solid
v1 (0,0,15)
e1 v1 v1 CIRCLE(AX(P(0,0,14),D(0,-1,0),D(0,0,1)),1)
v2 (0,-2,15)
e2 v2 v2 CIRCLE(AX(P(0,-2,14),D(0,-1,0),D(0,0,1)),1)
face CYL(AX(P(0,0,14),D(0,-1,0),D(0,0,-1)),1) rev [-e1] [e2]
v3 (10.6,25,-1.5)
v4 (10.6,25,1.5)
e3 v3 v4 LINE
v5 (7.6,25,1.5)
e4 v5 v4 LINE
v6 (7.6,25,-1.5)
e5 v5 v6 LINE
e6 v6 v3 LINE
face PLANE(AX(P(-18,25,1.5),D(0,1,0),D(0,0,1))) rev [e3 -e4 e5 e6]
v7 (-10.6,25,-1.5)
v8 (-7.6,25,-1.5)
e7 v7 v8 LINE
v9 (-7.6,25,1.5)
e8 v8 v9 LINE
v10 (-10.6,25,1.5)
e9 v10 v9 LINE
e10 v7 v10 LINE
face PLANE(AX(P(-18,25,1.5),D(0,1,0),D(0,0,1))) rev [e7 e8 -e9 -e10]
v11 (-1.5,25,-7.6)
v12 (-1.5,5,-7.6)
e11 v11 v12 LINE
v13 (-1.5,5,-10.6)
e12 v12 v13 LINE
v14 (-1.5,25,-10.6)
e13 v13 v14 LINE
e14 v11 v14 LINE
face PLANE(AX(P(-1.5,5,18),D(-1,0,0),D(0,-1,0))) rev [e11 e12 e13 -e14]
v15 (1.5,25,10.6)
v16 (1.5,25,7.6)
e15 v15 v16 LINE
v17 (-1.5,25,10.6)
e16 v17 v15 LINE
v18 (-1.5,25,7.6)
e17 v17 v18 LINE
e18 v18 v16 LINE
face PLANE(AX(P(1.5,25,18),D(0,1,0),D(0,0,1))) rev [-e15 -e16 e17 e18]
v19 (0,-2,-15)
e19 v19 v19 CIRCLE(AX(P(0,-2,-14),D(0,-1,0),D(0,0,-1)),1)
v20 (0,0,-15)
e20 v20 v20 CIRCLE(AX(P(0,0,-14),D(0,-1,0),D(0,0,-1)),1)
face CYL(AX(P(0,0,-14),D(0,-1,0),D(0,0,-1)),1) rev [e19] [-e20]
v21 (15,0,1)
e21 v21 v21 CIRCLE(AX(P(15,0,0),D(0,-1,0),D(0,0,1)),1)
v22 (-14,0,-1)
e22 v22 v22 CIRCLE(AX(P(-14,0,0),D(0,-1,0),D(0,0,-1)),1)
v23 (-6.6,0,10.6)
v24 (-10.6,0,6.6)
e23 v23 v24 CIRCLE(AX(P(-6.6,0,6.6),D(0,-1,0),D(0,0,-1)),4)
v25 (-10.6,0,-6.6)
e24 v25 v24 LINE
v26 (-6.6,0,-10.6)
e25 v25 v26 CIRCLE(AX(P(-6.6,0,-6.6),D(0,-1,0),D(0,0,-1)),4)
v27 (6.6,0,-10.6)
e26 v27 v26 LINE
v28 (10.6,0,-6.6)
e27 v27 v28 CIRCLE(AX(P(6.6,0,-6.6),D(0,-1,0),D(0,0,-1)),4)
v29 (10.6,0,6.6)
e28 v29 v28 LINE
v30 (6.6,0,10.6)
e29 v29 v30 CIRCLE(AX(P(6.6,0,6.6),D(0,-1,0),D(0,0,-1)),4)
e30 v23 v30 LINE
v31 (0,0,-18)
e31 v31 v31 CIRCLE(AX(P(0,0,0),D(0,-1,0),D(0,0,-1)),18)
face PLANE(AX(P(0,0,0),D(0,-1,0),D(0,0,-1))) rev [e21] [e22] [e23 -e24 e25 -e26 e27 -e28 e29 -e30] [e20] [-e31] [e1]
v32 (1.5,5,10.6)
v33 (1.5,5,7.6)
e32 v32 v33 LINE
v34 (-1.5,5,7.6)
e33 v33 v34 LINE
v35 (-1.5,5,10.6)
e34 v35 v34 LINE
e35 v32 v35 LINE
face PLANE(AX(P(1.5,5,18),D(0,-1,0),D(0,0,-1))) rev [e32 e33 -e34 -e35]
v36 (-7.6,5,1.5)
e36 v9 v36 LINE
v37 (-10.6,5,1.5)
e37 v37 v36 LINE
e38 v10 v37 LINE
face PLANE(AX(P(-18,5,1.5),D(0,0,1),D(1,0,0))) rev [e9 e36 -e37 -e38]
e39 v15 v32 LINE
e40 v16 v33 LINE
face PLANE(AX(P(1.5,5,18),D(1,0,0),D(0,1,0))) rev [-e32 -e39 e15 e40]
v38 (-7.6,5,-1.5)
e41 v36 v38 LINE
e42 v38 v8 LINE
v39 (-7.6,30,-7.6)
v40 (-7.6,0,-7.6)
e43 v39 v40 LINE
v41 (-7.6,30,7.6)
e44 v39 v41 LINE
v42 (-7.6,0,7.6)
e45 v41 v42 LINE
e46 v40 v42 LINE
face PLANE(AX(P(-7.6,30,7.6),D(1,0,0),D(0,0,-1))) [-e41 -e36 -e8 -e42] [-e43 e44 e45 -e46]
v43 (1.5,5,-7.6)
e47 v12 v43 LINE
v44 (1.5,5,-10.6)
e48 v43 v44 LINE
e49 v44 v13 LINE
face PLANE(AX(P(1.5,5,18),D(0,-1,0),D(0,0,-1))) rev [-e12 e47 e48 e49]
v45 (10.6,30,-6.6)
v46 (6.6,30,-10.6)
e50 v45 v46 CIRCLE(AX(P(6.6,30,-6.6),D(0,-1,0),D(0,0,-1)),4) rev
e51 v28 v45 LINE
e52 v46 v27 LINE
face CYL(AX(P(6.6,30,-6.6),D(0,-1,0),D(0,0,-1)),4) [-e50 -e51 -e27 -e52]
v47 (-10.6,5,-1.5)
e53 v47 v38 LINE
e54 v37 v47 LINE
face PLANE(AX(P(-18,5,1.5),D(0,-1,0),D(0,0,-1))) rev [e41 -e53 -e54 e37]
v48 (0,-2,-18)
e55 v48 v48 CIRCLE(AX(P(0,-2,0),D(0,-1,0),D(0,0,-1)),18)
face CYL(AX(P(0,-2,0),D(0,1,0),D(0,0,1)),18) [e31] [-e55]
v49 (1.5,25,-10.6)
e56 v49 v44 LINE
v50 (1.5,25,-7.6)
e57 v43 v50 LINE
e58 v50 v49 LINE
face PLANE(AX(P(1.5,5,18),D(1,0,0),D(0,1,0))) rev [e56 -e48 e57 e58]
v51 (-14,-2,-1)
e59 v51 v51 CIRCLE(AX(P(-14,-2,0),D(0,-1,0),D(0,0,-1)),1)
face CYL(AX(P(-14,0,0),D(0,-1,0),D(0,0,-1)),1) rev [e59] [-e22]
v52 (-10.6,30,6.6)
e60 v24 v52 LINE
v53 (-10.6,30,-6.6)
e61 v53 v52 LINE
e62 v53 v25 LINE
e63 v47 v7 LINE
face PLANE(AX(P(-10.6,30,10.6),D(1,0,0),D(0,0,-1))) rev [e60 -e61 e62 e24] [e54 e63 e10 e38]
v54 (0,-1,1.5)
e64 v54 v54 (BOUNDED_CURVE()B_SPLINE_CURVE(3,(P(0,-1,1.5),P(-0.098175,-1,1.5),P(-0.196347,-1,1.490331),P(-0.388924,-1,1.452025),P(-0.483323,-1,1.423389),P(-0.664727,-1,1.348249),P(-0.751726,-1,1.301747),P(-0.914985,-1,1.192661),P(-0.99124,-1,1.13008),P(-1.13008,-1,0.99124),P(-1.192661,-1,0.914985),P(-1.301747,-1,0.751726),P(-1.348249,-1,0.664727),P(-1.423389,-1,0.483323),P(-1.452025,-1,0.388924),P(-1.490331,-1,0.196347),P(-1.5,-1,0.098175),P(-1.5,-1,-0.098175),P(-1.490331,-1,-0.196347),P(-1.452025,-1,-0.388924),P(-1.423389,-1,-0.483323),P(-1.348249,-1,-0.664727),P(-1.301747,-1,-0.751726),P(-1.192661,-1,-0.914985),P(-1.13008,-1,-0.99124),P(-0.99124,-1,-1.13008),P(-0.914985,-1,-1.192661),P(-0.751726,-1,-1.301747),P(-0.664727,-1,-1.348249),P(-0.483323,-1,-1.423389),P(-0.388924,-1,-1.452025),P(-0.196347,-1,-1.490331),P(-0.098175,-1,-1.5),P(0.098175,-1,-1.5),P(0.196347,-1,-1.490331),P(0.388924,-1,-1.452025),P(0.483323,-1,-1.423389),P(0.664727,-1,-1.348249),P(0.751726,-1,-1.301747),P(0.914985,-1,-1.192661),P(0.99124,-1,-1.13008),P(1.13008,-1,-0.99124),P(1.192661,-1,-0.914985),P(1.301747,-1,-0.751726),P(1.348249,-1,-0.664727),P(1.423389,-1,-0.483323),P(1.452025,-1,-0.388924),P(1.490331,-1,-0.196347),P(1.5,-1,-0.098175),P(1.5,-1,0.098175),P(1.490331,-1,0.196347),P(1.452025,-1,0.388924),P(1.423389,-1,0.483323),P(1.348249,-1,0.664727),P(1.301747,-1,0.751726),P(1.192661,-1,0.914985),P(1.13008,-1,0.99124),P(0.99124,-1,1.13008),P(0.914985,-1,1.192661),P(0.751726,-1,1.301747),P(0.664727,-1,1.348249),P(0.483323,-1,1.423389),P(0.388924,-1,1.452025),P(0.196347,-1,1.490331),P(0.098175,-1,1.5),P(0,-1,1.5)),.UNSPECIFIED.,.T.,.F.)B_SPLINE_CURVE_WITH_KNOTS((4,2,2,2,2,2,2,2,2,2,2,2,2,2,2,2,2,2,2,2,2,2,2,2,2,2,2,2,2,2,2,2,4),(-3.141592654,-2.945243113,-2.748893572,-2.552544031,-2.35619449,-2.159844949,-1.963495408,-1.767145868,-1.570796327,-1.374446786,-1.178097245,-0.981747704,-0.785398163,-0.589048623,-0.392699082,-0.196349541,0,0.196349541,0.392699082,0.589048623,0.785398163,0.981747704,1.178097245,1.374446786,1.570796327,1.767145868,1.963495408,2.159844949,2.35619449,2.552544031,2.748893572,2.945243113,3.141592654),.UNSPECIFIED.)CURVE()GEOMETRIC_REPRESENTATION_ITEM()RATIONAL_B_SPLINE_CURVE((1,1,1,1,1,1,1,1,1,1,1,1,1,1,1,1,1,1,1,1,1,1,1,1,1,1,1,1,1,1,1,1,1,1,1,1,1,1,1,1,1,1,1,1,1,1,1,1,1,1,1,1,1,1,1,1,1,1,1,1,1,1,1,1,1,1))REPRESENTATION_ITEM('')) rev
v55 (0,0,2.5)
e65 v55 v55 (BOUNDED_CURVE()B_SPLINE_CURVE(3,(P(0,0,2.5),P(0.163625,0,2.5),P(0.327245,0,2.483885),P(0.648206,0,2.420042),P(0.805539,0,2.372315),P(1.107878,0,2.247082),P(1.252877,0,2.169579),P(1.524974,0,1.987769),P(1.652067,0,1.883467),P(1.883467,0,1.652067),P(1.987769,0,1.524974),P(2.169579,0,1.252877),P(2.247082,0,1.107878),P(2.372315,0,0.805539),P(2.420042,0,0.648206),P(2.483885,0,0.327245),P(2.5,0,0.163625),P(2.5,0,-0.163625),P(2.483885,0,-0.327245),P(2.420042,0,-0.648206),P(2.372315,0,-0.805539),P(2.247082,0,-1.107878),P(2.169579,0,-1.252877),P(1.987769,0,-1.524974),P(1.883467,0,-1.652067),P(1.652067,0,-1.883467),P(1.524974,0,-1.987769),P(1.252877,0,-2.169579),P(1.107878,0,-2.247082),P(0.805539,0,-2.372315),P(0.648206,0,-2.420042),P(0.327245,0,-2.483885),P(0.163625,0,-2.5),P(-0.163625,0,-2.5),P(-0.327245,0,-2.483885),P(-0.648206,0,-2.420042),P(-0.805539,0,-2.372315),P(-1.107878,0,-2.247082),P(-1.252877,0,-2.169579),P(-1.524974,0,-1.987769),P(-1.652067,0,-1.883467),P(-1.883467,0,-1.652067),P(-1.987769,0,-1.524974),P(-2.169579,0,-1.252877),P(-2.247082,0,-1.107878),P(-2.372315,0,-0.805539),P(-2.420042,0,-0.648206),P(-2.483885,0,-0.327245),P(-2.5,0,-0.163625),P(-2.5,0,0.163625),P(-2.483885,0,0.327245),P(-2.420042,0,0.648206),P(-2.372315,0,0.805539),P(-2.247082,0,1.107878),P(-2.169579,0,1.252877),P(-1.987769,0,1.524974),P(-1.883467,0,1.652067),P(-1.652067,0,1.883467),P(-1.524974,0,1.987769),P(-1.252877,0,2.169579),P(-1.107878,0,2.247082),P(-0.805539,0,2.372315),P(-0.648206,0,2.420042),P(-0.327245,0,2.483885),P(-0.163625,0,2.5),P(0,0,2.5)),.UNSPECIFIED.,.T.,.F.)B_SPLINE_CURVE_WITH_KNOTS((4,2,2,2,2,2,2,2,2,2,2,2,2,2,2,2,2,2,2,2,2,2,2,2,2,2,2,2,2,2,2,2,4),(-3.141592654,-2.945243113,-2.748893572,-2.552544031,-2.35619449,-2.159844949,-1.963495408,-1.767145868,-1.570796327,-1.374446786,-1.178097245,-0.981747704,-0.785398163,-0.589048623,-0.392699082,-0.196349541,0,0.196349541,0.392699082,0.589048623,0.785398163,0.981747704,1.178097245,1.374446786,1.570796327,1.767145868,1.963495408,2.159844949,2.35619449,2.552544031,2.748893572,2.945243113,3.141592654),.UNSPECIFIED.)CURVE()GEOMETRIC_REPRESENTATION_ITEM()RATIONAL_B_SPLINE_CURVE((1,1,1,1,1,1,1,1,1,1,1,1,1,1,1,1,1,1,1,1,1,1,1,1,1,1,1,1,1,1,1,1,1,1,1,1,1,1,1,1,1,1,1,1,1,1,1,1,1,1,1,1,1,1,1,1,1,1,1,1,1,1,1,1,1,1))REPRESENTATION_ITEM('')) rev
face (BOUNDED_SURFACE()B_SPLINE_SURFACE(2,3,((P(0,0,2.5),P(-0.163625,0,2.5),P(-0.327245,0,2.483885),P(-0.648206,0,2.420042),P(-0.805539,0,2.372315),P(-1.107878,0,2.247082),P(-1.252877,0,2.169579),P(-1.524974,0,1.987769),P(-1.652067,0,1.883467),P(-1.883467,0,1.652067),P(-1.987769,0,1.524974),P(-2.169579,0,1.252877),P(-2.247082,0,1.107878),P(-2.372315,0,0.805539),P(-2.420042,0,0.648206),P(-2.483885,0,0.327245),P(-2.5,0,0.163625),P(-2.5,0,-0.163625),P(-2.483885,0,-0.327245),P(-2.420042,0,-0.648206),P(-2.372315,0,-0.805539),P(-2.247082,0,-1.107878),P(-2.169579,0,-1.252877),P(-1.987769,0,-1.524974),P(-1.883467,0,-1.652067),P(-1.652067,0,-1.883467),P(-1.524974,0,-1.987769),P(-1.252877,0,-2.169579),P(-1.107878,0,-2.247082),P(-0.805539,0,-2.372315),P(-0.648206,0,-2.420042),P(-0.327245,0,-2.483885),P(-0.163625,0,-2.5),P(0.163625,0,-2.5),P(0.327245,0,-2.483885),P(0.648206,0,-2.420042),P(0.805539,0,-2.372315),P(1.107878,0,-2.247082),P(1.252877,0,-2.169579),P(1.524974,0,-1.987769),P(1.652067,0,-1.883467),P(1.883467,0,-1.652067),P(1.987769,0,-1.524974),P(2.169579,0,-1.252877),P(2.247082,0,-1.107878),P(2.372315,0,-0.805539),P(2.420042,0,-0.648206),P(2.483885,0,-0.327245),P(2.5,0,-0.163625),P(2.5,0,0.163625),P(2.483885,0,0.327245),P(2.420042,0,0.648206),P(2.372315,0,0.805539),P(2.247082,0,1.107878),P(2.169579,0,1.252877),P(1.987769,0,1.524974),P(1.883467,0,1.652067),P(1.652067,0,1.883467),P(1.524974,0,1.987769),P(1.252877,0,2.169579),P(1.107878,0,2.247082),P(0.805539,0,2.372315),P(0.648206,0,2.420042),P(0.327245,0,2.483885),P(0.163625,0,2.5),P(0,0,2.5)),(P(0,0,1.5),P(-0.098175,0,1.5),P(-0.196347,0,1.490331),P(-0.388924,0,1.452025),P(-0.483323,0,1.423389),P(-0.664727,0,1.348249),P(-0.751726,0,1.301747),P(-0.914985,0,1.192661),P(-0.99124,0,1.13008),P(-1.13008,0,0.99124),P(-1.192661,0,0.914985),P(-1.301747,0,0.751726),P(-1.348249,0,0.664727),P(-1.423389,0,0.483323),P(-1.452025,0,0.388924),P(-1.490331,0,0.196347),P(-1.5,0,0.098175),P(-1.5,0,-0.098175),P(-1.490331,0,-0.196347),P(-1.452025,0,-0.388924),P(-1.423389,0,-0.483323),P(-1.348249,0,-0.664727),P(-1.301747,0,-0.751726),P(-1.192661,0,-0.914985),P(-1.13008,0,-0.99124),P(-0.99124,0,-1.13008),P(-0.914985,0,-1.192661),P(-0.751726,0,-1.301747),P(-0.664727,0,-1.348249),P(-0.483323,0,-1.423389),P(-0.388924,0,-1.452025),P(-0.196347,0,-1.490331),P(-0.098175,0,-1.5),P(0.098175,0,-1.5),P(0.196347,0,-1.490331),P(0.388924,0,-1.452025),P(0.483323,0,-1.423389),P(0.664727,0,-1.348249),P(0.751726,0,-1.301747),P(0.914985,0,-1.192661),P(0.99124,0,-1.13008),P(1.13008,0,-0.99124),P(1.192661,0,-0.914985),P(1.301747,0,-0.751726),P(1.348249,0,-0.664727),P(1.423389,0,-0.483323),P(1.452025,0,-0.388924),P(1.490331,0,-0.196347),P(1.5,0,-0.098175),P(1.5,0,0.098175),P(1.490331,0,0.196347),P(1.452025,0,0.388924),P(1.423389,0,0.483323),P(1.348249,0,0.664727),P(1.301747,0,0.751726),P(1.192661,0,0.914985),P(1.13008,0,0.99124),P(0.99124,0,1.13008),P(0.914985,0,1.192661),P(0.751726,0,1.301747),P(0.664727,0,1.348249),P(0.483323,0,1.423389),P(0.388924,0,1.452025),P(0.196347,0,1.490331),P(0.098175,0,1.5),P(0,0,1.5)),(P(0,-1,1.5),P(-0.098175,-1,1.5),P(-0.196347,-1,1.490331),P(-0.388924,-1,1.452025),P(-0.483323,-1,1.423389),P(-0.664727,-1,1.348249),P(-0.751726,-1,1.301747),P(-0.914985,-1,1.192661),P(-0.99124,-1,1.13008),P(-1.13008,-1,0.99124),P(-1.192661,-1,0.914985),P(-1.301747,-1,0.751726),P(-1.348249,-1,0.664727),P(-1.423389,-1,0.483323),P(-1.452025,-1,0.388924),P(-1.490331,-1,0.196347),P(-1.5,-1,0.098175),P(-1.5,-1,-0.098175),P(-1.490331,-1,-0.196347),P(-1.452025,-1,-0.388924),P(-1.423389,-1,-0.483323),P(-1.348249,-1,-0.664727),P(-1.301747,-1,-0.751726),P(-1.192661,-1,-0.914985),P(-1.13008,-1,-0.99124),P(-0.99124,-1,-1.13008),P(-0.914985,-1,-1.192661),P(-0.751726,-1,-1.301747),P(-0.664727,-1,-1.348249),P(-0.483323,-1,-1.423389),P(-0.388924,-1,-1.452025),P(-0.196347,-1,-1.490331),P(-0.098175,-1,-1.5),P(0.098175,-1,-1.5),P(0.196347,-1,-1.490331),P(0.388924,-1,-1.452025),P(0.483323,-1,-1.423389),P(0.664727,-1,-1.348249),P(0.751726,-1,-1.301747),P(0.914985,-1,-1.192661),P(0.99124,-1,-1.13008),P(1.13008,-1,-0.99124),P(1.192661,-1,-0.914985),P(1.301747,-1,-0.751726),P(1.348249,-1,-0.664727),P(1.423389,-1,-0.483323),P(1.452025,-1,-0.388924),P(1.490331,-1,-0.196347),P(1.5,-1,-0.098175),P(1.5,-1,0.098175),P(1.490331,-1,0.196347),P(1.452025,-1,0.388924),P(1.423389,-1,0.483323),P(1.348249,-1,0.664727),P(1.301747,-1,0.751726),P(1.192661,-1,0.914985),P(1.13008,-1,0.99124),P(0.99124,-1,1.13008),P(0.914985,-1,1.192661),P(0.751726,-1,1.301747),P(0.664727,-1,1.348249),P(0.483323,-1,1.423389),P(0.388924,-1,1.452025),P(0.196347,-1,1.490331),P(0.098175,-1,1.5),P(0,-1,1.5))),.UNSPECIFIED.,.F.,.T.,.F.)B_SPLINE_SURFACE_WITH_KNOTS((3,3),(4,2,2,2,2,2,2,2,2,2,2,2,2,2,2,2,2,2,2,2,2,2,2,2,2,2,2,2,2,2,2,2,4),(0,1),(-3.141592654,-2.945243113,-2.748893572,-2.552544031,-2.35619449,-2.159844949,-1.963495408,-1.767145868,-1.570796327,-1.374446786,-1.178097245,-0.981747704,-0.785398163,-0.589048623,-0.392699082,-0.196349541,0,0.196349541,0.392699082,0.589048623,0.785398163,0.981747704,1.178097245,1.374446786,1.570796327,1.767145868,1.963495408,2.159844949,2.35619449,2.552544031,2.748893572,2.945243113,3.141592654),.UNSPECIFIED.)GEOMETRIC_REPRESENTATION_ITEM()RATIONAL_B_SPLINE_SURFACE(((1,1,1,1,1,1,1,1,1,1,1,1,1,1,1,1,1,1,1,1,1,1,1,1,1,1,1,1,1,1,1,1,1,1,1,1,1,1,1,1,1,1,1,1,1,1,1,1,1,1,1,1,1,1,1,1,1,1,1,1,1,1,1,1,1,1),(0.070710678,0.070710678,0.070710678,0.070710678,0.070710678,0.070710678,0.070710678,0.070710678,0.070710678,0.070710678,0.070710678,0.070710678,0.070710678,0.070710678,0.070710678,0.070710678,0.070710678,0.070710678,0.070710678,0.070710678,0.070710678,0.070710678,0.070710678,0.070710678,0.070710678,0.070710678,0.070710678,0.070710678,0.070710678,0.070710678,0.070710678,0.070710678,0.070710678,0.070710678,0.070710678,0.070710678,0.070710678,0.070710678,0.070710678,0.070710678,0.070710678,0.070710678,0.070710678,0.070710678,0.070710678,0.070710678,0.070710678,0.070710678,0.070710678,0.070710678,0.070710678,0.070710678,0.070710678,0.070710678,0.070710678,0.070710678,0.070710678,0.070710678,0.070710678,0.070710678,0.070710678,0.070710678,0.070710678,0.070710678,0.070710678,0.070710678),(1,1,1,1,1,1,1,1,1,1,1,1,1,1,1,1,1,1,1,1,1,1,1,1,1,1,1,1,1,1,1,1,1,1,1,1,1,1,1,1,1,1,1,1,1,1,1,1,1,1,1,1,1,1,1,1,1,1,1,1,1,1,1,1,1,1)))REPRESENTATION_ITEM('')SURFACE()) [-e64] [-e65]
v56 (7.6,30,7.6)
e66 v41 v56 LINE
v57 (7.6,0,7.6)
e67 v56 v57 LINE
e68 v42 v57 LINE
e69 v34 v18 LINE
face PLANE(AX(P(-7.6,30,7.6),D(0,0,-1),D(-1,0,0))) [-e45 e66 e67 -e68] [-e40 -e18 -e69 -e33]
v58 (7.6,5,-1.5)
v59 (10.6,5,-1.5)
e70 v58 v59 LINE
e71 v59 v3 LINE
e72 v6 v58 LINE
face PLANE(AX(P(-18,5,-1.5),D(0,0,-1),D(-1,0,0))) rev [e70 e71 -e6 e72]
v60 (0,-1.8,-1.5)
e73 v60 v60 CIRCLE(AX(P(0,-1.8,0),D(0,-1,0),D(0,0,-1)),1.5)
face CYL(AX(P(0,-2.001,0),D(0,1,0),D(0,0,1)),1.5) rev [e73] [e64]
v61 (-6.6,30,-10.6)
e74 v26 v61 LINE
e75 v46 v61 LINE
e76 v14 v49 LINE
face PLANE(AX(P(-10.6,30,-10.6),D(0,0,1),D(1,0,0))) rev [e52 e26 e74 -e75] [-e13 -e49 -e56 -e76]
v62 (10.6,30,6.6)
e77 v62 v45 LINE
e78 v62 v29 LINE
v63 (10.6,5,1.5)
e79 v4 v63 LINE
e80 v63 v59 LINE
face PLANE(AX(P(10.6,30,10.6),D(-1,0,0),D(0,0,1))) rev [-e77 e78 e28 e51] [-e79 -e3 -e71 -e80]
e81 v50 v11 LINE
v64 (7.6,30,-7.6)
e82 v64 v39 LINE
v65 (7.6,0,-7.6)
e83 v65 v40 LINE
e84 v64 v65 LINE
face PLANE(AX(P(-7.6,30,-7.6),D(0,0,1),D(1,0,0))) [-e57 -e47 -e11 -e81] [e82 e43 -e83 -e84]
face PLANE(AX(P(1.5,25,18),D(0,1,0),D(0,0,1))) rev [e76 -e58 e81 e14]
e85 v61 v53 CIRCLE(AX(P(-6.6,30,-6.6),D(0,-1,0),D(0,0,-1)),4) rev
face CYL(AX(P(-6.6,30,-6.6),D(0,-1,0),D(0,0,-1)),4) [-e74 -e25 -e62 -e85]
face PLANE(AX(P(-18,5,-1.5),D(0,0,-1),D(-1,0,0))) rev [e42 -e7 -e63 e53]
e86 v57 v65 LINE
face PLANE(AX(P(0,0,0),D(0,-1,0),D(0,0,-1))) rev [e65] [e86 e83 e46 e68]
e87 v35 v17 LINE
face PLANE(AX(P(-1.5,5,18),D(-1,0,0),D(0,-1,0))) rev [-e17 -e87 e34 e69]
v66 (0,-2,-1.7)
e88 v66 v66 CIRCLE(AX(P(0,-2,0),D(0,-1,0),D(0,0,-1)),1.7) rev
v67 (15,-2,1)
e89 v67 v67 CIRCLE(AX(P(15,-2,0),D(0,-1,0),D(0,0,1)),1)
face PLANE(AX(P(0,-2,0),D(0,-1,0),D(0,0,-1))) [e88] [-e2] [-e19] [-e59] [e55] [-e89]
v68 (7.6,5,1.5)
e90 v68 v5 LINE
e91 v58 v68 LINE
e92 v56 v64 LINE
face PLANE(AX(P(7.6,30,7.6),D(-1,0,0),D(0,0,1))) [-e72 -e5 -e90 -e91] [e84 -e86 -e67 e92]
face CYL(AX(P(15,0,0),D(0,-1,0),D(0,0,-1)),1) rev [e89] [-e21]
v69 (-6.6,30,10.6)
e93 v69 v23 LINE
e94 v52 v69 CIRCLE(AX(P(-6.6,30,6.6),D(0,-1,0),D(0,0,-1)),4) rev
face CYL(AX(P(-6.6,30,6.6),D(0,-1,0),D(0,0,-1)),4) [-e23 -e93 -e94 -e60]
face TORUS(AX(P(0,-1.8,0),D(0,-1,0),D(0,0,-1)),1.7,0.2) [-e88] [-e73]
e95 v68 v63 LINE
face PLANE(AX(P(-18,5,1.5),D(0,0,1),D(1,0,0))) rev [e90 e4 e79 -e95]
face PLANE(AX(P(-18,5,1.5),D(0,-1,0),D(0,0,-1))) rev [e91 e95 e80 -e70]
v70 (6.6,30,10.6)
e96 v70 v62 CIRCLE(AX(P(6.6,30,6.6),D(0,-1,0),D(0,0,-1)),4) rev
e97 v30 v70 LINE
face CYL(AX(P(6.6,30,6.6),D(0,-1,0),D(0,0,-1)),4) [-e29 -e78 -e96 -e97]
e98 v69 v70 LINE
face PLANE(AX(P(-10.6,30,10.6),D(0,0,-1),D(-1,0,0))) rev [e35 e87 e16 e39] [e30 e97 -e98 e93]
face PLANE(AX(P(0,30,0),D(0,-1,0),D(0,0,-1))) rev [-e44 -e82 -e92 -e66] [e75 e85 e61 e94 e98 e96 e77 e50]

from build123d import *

# Parameters (mm, degrees)
SKETCH1_W           = 21.2
SKETCH1_H           = 21.2
SKETCH1_W_2         = 15.2
SKETCH1_H_2         = 15.2
BOSS_EXTRUDE1_DEPTH = 30
FILLET1_R           = 4
SKETCH3_R           = 18
BOSS_EXTRUDE2_DEPTH = 2
CUT_EXTRUDE2_REACH  = 41.345
SKETCH4_R           = 1.5
SKETCH5_W           = 3
SKETCH5_H           = 20
CUT_EXTRUDE3_DEPTH  = 46.188051518
SKETCH6_W           = 3
SKETCH6_H           = 20
CUT_EXTRUDE4_DEPTH  = 46.188051518
SKETCH7_R           = 1
CUT_EXTRUDE5_DEPTH  = 2
FILLET4_SIZE        = 1
FILLET5_R           = 0.2


with BuildPart() as part:
    # Sketch1 → Boss-Extrude1 (new body)
    with BuildSketch(Plane(origin=(0, 0, 0), x_dir=(1, 0, 0), z_dir=(0, 1, 0))):
        Rectangle(SKETCH1_W, SKETCH1_H)
        Rectangle(SKETCH1_W_2, SKETCH1_H_2, mode=Mode.SUBTRACT)
    extrude(amount=BOSS_EXTRUDE1_DEPTH)

    # Fillet1
    fillet1_edges = [part.edges().sort_by_distance(p)[0] for p in [
        (10.6, 15, 10.6),
        (-10.6, 15, 10.6),
        (-10.6, 15, -10.6),
        (10.6, 15, -10.6),
    ]]
    fillet(fillet1_edges, radius=FILLET1_R)

    # Sketch3 → Boss-Extrude2 (add)
    with BuildSketch(Plane.XZ):
        with Locations(Location((0, 0, 0), (0, 0, 270))):
            Circle(SKETCH3_R)
    extrude(amount=BOSS_EXTRUDE2_DEPTH)

    # Sketch4 → Cut-Extrude2 (cut, up to next)
    with BuildSketch(Plane(origin=(0, 0, 0), x_dir=(1, 0, 0), z_dir=(0, 1, 0)), mode=Mode.PRIVATE) as cut_extrude2_sk1:
        with Locations(Location((0, 0, 0), (0, 0, 270))):
            Circle(SKETCH4_R)
    cut_extrude2_tool1 = extrude(cut_extrude2_sk1.sketch, amount=-CUT_EXTRUDE2_REACH, mode=Mode.PRIVATE) & part.part
    add(cut_extrude2_tool1.solids().sort_by_distance((0, 0, 0))[0], mode=Mode.SUBTRACT)

    # Sketch5 → Cut-Extrude3 (cut, through all)
    with BuildSketch(Plane(origin=(0, 0, -10.6), x_dir=(-1, 0, 0), z_dir=(0, 0, -1))):
        with Locations((0, 15)):
            Rectangle(SKETCH5_W, SKETCH5_H)
    extrude(amount=-CUT_EXTRUDE3_DEPTH, mode=Mode.SUBTRACT)

    # Sketch6 → Cut-Extrude4 (cut, through all)
    with BuildSketch(Plane(origin=(10.6, 0, 0), x_dir=(0, 0, -1), z_dir=(1, 0, 0))):
        with Locations((0, 15)):
            Rectangle(SKETCH6_W, SKETCH6_H)
    extrude(amount=-CUT_EXTRUDE4_DEPTH, mode=Mode.SUBTRACT)

    # Sketch7 → Cut-Extrude5 (cut)
    with BuildSketch(Plane(origin=(0, -2, 0), x_dir=(-1, 0, 0), z_dir=(0, -1, 0))):
        with Locations(Location((14, 0, 0), (0, 0, 90))):
            Circle(SKETCH7_R)
        with Locations(Location((-15, 0, 0), (0, 0, 270))):
            Circle(SKETCH7_R)
        with Locations(Location((0, 14, 0), (0, 0, 90))):
            Circle(SKETCH7_R)
        with Locations(Location((0, -14, 0), (0, 0, 270))):
            Circle(SKETCH7_R)
    extrude(amount=-CUT_EXTRUDE5_DEPTH, mode=Mode.SUBTRACT)

    # Fillet4
    # a fillet whose section is not a circle: 1 mm, written as the material it takes off along each edge
    with BuildSketch(Plane(origin=(0, 0, 0), x_dir=(0, 0, 1), z_dir=(-1, 0, 0))) as fillet4_piece_1:
        with BuildLine():
            Bezier((1.5, -FILLET4_SIZE), (1.5, 0), (1.5 + FILLET4_SIZE, 0), weights=[1, 0.070710678, 1])
            Line((1.5 + FILLET4_SIZE, 0), (1.5, 0))
            Line((1.5, 0), (1.5, -FILLET4_SIZE))
        make_face()
    revolve(axis=Axis((0, 0, 0), (0, 1, 0)), mode=Mode.SUBTRACT)

    # Fillet5
    fillet5_edges = [part.edges().sort_by_distance(p)[0] for p in [
        (0, -2, -1.5),
    ]]
    fillet(fillet5_edges, radius=FILLET5_R)


solid = part.part
